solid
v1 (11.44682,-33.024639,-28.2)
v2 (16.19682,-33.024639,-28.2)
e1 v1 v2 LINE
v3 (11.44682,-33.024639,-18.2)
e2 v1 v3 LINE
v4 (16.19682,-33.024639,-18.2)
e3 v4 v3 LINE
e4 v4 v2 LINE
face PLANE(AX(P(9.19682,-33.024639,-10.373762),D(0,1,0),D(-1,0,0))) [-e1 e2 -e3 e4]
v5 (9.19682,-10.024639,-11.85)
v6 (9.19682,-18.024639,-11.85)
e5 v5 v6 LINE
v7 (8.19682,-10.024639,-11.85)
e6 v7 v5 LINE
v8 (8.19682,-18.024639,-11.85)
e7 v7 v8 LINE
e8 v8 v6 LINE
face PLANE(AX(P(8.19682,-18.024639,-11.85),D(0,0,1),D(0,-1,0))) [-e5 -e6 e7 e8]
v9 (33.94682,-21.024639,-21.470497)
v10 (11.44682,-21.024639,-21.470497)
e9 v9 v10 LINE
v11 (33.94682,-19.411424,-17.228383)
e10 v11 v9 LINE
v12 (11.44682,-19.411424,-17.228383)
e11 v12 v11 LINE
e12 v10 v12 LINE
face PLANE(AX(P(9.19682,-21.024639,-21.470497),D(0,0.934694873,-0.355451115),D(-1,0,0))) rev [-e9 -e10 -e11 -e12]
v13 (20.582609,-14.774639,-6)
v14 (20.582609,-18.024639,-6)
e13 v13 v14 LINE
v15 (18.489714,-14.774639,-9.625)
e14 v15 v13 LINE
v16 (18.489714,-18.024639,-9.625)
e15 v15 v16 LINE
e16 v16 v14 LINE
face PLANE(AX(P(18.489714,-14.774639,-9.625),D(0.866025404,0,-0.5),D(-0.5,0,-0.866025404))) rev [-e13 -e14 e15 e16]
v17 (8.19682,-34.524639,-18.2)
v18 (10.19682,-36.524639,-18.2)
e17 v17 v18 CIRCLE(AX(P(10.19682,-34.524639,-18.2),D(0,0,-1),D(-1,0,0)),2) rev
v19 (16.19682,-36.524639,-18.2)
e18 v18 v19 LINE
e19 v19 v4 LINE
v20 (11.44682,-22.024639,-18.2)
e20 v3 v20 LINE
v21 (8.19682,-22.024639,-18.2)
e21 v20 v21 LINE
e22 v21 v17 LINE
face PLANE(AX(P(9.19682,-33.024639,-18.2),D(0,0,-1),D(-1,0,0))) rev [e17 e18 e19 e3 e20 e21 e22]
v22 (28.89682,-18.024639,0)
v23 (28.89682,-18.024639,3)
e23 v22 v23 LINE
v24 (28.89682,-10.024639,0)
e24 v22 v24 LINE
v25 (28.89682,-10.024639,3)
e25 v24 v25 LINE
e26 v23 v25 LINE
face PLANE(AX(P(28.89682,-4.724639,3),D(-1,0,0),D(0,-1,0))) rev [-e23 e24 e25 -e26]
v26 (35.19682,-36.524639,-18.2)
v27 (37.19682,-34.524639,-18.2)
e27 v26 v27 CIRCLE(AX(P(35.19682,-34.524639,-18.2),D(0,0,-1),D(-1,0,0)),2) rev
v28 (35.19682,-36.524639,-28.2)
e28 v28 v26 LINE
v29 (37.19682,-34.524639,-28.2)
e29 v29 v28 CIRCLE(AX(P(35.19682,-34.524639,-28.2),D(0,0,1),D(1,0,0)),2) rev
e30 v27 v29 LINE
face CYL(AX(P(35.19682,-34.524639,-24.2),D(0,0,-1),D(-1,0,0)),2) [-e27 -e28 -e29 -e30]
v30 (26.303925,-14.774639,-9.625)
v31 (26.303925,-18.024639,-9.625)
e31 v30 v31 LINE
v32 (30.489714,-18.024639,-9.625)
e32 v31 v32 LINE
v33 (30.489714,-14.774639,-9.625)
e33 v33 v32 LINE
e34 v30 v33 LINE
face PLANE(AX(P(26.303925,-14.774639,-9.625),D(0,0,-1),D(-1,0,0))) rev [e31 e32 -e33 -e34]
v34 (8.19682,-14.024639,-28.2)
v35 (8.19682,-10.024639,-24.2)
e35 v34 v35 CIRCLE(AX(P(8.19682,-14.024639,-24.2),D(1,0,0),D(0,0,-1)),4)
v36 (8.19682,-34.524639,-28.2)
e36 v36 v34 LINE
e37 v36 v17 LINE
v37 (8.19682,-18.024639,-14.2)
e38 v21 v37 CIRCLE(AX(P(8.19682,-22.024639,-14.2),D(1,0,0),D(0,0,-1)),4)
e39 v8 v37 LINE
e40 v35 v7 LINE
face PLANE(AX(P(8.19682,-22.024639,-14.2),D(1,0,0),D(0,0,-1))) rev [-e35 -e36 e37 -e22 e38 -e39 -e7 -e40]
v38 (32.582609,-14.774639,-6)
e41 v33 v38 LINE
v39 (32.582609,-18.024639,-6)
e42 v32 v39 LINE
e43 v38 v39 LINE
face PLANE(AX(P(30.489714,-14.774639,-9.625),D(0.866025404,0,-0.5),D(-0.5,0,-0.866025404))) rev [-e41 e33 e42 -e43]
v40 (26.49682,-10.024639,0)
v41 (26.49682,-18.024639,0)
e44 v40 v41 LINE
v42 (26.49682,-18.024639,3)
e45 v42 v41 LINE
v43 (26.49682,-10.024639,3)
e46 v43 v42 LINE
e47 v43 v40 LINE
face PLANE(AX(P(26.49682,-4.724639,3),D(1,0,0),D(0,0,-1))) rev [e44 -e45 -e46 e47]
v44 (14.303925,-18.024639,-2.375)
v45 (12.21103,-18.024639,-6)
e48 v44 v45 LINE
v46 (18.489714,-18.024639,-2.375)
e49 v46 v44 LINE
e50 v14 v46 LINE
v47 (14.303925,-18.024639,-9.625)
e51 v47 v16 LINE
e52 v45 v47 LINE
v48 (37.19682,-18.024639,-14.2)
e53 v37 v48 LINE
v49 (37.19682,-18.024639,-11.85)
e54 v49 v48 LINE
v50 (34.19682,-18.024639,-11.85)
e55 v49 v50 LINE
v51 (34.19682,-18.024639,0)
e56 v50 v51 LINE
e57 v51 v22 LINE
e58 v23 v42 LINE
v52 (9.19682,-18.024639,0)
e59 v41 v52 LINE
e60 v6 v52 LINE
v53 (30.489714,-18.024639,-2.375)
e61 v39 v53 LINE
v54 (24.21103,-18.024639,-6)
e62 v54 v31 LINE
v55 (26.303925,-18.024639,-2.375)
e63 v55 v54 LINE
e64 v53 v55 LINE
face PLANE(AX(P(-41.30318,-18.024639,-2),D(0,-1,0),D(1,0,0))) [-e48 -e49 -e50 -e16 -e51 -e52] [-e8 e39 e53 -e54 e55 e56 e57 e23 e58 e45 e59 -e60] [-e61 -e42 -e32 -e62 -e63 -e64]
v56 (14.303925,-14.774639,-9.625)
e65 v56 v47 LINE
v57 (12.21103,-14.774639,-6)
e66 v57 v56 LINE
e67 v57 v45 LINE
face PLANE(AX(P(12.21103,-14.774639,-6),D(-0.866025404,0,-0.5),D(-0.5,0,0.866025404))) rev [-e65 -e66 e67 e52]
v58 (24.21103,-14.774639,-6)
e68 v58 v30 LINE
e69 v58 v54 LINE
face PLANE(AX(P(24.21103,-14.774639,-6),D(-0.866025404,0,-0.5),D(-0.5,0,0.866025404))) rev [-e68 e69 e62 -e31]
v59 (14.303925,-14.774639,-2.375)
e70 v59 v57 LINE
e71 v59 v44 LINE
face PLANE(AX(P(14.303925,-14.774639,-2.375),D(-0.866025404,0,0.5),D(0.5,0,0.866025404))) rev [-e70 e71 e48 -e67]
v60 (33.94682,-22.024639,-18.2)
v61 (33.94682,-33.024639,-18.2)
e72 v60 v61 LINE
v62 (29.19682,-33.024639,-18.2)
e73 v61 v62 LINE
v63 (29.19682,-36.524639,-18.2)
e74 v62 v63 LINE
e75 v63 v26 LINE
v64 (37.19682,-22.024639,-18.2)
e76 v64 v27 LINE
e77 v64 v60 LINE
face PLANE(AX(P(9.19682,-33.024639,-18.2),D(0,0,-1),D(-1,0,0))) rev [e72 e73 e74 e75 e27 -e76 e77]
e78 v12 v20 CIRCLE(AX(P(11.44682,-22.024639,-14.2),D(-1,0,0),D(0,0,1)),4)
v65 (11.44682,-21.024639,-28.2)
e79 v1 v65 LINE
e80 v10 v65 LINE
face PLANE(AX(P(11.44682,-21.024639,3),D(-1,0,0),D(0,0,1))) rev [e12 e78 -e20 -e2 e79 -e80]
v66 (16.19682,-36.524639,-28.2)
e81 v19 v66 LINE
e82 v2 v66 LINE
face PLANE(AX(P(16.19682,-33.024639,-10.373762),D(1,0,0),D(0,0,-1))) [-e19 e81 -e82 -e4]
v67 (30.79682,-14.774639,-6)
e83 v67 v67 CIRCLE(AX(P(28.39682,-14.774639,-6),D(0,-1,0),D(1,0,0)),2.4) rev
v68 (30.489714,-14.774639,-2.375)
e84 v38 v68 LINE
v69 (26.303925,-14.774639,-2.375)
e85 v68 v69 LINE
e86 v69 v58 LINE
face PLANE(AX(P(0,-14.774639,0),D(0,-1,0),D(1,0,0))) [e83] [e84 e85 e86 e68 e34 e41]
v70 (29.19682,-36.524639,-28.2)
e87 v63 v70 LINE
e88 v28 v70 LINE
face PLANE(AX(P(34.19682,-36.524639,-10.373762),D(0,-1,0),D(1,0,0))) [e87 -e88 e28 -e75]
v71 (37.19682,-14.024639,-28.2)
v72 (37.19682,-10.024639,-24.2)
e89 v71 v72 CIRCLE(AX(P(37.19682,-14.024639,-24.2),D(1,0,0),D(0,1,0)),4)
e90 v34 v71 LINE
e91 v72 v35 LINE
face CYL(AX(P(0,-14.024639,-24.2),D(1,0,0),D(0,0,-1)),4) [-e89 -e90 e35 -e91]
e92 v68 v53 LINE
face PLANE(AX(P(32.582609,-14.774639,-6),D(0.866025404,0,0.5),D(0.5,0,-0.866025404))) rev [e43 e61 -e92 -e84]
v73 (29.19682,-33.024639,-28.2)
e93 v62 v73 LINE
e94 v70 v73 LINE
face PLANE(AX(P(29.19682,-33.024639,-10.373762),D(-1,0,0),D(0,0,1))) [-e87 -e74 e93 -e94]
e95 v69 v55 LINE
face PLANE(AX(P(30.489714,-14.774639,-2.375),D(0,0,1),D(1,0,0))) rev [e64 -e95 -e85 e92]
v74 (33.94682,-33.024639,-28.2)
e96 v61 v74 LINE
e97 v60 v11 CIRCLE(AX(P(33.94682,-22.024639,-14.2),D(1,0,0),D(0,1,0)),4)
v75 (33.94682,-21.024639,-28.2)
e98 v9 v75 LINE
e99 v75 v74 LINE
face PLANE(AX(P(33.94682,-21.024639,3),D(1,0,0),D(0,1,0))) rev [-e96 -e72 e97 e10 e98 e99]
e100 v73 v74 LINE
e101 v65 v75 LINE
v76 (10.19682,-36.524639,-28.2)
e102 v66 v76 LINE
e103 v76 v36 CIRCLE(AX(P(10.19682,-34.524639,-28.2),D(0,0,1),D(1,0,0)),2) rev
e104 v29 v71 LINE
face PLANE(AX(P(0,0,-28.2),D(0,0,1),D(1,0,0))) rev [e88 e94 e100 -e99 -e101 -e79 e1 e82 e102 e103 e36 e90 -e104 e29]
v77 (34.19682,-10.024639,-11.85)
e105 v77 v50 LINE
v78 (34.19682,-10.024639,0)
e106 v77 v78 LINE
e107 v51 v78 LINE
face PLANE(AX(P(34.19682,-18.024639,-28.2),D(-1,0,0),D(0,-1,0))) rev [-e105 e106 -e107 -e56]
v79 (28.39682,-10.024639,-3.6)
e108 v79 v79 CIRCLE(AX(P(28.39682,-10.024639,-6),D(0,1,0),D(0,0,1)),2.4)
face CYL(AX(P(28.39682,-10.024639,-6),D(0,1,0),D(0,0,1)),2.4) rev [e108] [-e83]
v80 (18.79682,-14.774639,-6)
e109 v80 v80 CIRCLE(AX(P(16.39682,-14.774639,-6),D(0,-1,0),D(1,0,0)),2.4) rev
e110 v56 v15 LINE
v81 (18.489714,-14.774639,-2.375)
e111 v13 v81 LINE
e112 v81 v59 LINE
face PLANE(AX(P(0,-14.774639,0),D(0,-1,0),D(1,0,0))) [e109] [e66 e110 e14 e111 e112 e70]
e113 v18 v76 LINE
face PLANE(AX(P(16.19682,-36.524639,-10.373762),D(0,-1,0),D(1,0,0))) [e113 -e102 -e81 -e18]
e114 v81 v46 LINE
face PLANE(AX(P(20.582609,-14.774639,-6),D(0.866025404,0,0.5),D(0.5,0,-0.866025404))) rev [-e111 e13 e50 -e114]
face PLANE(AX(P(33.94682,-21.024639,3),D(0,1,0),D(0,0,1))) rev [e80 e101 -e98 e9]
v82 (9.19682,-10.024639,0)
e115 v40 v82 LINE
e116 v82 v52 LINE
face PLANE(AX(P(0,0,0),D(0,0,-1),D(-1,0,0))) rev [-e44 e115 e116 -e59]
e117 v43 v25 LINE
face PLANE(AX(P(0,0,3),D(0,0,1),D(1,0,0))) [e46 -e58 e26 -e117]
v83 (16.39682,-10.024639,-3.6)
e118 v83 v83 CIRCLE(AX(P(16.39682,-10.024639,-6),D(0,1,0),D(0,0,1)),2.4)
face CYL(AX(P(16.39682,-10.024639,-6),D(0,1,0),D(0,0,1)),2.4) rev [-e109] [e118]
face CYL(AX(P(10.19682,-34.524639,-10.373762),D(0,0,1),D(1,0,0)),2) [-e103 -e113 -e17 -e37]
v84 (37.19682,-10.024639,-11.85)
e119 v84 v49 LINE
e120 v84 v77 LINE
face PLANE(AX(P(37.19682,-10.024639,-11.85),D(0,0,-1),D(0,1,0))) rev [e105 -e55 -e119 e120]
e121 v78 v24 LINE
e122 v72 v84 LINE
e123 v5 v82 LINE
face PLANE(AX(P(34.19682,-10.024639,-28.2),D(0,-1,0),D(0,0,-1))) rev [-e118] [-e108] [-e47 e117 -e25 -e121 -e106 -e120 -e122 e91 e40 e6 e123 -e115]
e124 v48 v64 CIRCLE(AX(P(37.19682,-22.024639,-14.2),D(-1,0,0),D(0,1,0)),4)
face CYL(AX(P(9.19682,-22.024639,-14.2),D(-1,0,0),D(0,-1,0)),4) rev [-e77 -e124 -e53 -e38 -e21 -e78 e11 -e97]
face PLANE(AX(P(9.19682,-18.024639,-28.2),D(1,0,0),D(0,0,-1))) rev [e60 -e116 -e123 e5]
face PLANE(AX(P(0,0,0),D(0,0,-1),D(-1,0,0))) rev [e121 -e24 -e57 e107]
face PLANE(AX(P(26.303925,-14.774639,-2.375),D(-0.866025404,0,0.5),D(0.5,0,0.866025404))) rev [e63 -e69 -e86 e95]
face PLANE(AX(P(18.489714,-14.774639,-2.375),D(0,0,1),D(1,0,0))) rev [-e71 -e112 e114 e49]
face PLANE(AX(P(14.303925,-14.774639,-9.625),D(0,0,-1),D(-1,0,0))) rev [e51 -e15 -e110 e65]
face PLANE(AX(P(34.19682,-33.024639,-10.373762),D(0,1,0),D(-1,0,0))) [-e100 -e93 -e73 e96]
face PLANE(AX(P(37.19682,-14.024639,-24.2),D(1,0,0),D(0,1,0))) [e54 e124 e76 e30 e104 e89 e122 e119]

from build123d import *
from OCP.BRepFilletAPI import BRepFilletAPI_MakeChamfer
from build123d.topology import SkipClean

# Parameters (mm, degrees)
SKETCH1_R                      = 3.1
SKETCH1_R_2                    = 3.5
SKETCH1_W                      = 32
SKETCH1_H                      = 15.65
BOSS_EXTRUDE1_DEPTH            = 11.7
CUT_EXTRUDE5_DEPTH             = 14
CUT_EXTRUDE8_REACH             = 96.23
SKETCH10_R                     = 1.675
CUT_EXTRUDE8_DIRECTION_2_REACH = 96.23
CUT_EXTRUDE9_REACH             = 94.724
SKETCH11_R                     = 1.625
CUT_EXTRUDE9_DIRECTION_2_REACH = 94.724
CUT_EXTRUDE10_DEPTH            = 2.3
CUT_EXTRUDE11_DEPTH            = 2.3
HOLE1_D                        = 4.8
HOLE1_DEPTH                    = 12
HOLE1_CBORE_D                  = 5.4
HOLE1_CBORE_DEPTH              = 6
CUT_EXTRUDE17_REACH            = 66.001
SKETCH30_W                     = 59.4
SKETCH30_H                     = 25.65
SKETCH32_W                     = 99
SKETCH32_H                     = 8
CUT_EXTRUDE20_DEPTH            = 65.000566192
CHAMFER1_SIZE                  = 6
CHAMFER1_SIZE_2                = 0.3
FILLET1_R                      = 2
SKETCH33_W                     = 2.4
SKETCH33_H                     = 5.3
BOSS_EXTRUDE2_DEPTH            = 3
SKETCH34_W                     = 99
SKETCH34_H                     = 8
CUT_EXTRUDE21_DEPTH            = 61.759087383
CUT_EXTRUDE22_START            = -11.7
CUT_EXTRUDE22_DEPTH            = 11.7
BOSS_EXTRUDE4_DEPTH            = 8
SKETCH37_W                     = 25
SKETCH37_H                     = 8
BOSS_EXTRUDE5_DEPTH            = 16.5
SKETCH39_W                     = 25
SKETCH39_H                     = 10
BOSS_EXTRUDE6_DEPTH            = 15
SKETCH40_W                     = 22.5
SKETCH40_H                     = 12
CUT_EXTRUDE23_DEPTH            = 72.876300078
FILLET2_R                      = 4
CUT_EXTRUDE26_DEPTH            = 67.820749119
SKETCH49_W                     = 5
SKETCH49_H                     = 3.5
SKETCH49_W_2                   = 7
BOSS_EXTRUDE7_DEPTH            = 10
M4_CLEARANCE_HOLE1_D           = 4.8
CUT_EXTRUDE27_DEPTH            = 3.25
BOSS_EXTRUDE9_DEPTH            = 3
CHAMFER2_START                 = 11.446819666
CHAMFER2_DEPTH                 = 22.5
BOSS_EXTRUDE10_START           = -25
BOSS_EXTRUDE10_DEPTH           = 1
FILLET3_R                      = 2


with BuildPart() as part:
    # Sketch1 → Boss-Extrude1 (new body)
    with BuildSketch(Plane.XY):
        Polygon((-43.303180334, 29.275360835), (25.696819666, 29.275360835), (55.696819666, 29.275360835), (55.696819666, -18.024639165), (-43.303180334, -18.024639165), align=None)
        with Locations((-32.303180334, 10.275360835)):
            Circle(SKETCH1_R, mode=Mode.SUBTRACT)
        with Locations((44.696819666, 10.275360835)):
            Circle(SKETCH1_R, mode=Mode.SUBTRACT)
        with Locations((22.696819666, 12.275360835)):
            Circle(SKETCH1_R_2, mode=Mode.SUBTRACT)
        with Locations((-6.803180334, 11.450360835)):
            Rectangle(SKETCH1_W, SKETCH1_H, mode=Mode.SUBTRACT)
    extrude(amount=-BOSS_EXTRUDE1_DEPTH)

    # Sketch7 → Cut-Extrude5 (cut)
    with BuildSketch(Plane.XY):
        with BuildLine():
            Line((-43.303180334, 22.775360835), (-22.503180334, 22.775360835))
            Line((-22.503180334, 22.775360835), (-22.503180334, 3.625360835))
            Line((-22.503180334, 3.625360835), (-24.503180334, 3.625360835))
            Line((-24.503180334, 3.625360835), (-24.503180334, 21.275360835))
            Line((-24.503180334, 21.275360835), (-31.503180334, 21.275360835))
            Line((-31.503180334, 21.275360835), (-31.503180334, 13.270356662))
            ThreePointArc((-31.503180334, 13.270356662), (-32.303180334, 7.175360835), (-33.103180334, 13.270356662))
            Line((-33.103180334, 13.270356662), (-33.103180334, 21.275360835))
            Line((-33.103180334, 21.275360835), (-40.103180334, 21.275360835))
            Line((-40.103180334, 21.275360835), (-40.103180334, 3.625360835))
            Line((-40.103180334, 3.625360835), (-43.303180334, 3.625360835))
            Line((-43.303180334, 3.625360835), (-43.303180334, 22.775360835))
        make_face()
        with BuildLine():
            Line((34.896819666, 22.775360835), (55.696819666, 22.775360835))
            Line((55.696819666, 22.775360835), (55.696819666, 3.625360835))
            Line((55.696819666, 3.625360835), (52.496819666, 3.625360835))
            Line((52.496819666, 3.625360835), (52.496819666, 21.275360835))
            Line((52.496819666, 21.275360835), (45.496819666, 21.275360835))
            Line((45.496819666, 21.275360835), (45.496819666, 13.270356662))
            ThreePointArc((45.496819666, 13.270356662), (44.696819666, 7.175360835), (43.896819666, 13.270356662))
            Line((43.896819666, 13.270356662), (43.896819666, 21.275360835))
            Line((43.896819666, 21.275360835), (36.896819666, 21.275360835))
            Line((36.896819666, 21.275360835), (36.896819666, 3.625360835))
            Line((36.896819666, 3.625360835), (34.896819666, 3.625360835))
            Line((34.896819666, 3.625360835), (34.896819666, 22.775360835))
        make_face()
    extrude(amount=-CUT_EXTRUDE5_DEPTH, mode=Mode.SUBTRACT)

    # Sketch10 → Cut-Extrude8 (cut, up to next)
    with BuildSketch(Plane(origin=(-33.103180334, 0, 0), x_dir=(0, 0, -1), z_dir=(1, 0, 0)), mode=Mode.PRIVATE) as cut_extrude8_sk1:
        with Locations(Location((5.85, 17.272858748, 0), (0, 0, 270))):
            Circle(SKETCH10_R)
    cut_extrude8_tool1 = extrude(cut_extrude8_sk1.sketch, amount=-CUT_EXTRUDE8_REACH, mode=Mode.PRIVATE) & part.part
    add(cut_extrude8_tool1.solids().sort_by_distance((-33.10318, 17.272859, -5.85))[0], mode=Mode.SUBTRACT)

    # Sketch10 → Cut-Extrude8 direction 2 (cut, up to next)
    with BuildSketch(Plane(origin=(-33.103180334, 0, 0), x_dir=(0, 0, -1), z_dir=(1, 0, 0)), mode=Mode.PRIVATE) as cut_extrude8_direction_2_sk1:
        with Locations(Location((5.85, 17.272858748, 0), (0, 0, 270))):
            Circle(SKETCH10_R)
    cut_extrude8_direction_2_tool1 = extrude(cut_extrude8_direction_2_sk1.sketch, amount=CUT_EXTRUDE8_DIRECTION_2_REACH, mode=Mode.PRIVATE) & part.part
    add(cut_extrude8_direction_2_tool1.solids().sort_by_distance((-33.10318, 17.272859, -5.85))[0], mode=Mode.SUBTRACT)

    # Sketch11 → Cut-Extrude9 (cut, up to next)
    with BuildSketch(Plane(origin=(43.896819666, 0, 0), x_dir=(0, 0, -1), z_dir=(1, 0, 0)), mode=Mode.PRIVATE) as cut_extrude9_sk1:
        with Locations(Location((5.85, 17.272858748, 0), (0, 0, 180))):
            Circle(SKETCH11_R)
    cut_extrude9_tool1 = extrude(cut_extrude9_sk1.sketch, amount=-CUT_EXTRUDE9_REACH, mode=Mode.PRIVATE) & part.part
    add(cut_extrude9_tool1.solids().sort_by_distance((43.89682, 17.272859, -5.85))[0], mode=Mode.SUBTRACT)

    # Sketch11 → Cut-Extrude9 direction 2 (cut, up to next)
    with BuildSketch(Plane(origin=(43.896819666, 0, 0), x_dir=(0, 0, -1), z_dir=(1, 0, 0)), mode=Mode.PRIVATE) as cut_extrude9_direction_2_sk1:
        with Locations(Location((5.85, 17.272858748, 0), (0, 0, 180))):
            Circle(SKETCH11_R)
    cut_extrude9_direction_2_tool1 = extrude(cut_extrude9_direction_2_sk1.sketch, amount=CUT_EXTRUDE9_DIRECTION_2_REACH, mode=Mode.PRIVATE) & part.part
    add(cut_extrude9_direction_2_tool1.solids().sort_by_distance((43.89682, 17.272859, -5.85))[0], mode=Mode.SUBTRACT)

    # Sketch12 → Cut-Extrude10 (cut)
    with BuildSketch(Plane.ZY.offset(-36.896819666)):
        Polygon((-4.146816706, 20.222858748), (0, 20.222858748), (0, 14.322858748), (-4.146816706, 14.322858748), (-7.553183294, 14.322858748), (-9.256366588, 17.272858748), (-7.553183294, 20.222858748), align=None)
    extrude(amount=-CUT_EXTRUDE10_DEPTH, mode=Mode.SUBTRACT)

    # Sketch13 → Cut-Extrude11 (cut)
    with BuildSketch(Plane(origin=(-24.503180334, 0, 0), x_dir=(0, 0, -1), z_dir=(1, 0, 0))):
        Polygon((4.146816706, 20.222858748), (0, 20.222858748), (0, 14.322858748), (4.146816706, 14.322858748), (7.553183294, 14.322858748), (9.256366588, 17.272858748), (7.553183294, 20.222858748), align=None)
    extrude(amount=-CUT_EXTRUDE11_DEPTH, mode=Mode.SUBTRACT)

    # Hole1
    with Locations(Plane(origin=(0, 3.625360835, 0), x_dir=(1, 0, 0), z_dir=(0, 1, 0))):
        with Locations((-15.653180334, 5.85), (0.346819666, 5.85)):
            CounterBoreHole(HOLE1_D / 2, HOLE1_CBORE_D / 2, HOLE1_CBORE_DEPTH, depth=HOLE1_DEPTH)

    # Sketch30 → Cut-Extrude17 (cut, up to next)
    with BuildSketch(Plane(origin=(0, 0, -11.7), x_dir=(-1, 0, 0), z_dir=(0, 0, -1)), mode=Mode.PRIVATE) as cut_extrude17_sk1:
        with Locations((-5.196819666, 16.450360835)):
            Rectangle(SKETCH30_W, SKETCH30_H)
    cut_extrude17_tool1 = extrude(cut_extrude17_sk1.sketch, amount=-CUT_EXTRUDE17_REACH, mode=Mode.PRIVATE) & part.part
    add(cut_extrude17_tool1.solids().sort_by_distance((5.19682, 16.450361, -11.7))[0], mode=Mode.SUBTRACT)


with BuildPart() as cut_extrude17_piece_1:
    # of the separate pieces the step leaves, piece 1, a body of its own (cut_extrude17_pieces)
    add(part.part.solids().sort_by_distance((-24.503180334, 3.625360835, 0))[0])

    # Chamfer1
    chamfer1_edges_1 = [cut_extrude17_piece_1.edges().sort_by_distance(p)[0] for p in [
        (-2.353180334, -2.374639165, -5.85),
    ]]
    chamfer1_side_1 = [cut_extrude17_piece_1.faces().sort_by_distance(p)[0] for p in [
        (-2.353180334, -2.368639165, -5.85),
    ]]
    chamfer1_edges_2 = [cut_extrude17_piece_1.edges().sort_by_distance(p)[0] for p in [
        (-18.353180334, -2.374639165, -5.85),
    ]]
    chamfer1_side_2 = [cut_extrude17_piece_1.faces().sort_by_distance(p)[0] for p in [
        (-18.353180334, -2.368639165, -5.85),
    ]]
    chamfer1 = BRepFilletAPI_MakeChamfer(cut_extrude17_piece_1.part.solid().wrapped)
    for e in chamfer1_edges_1:
        chamfer1.Add(CHAMFER1_SIZE - 0.0001, CHAMFER1_SIZE_2 - 0.0001, e.wrapped, chamfer1_side_1[0].wrapped)
    for e in chamfer1_edges_2:
        chamfer1.Add(CHAMFER1_SIZE - 0.0001, CHAMFER1_SIZE_2 - 0.0001, e.wrapped, chamfer1_side_2[0].wrapped)
    add(Compound.cast(chamfer1.Shape()), mode=Mode.REPLACE)  # a hair under: the kernel refuses the full size

    # Fillet1
    # the kernel refuses this fillet: 2 mm, written as the material it takes off along each edge
    with BuildSketch(Plane(origin=(50.496819666, 19.275360835, -2), x_dir=(1, 0, 0), z_dir=(0, 1, 0))) as fillet1_piece_1_section:
        Polygon((0, 0), (FILLET1_R, 0), (FILLET1_R, -FILLET1_R), (0, -FILLET1_R), align=None)
    fillet1_piece_1 = extrude(amount=FILLET1_R, mode=Mode.PRIVATE)
    fillet1_piece_1 = fillet1_piece_1 - Plane(origin=(50.496819666, 19.275360835, -2), x_dir=(-0.7071067811865475, 0, -0.7071067811865475), z_dir=(0, 1, 0)) * Sphere(FILLET1_R, mode=Mode.PRIVATE)
    add(fillet1_piece_1, mode=Mode.SUBTRACT)
    with BuildSketch(Plane(origin=(50.496819666, 19.275360835, -9.7), x_dir=(1, 0, 0), z_dir=(0, 1, 0))) as fillet1_piece_2_section:
        Polygon((0, 0), (FILLET1_R, 0), (FILLET1_R, FILLET1_R), (0, FILLET1_R), align=None)
    fillet1_piece_2 = extrude(amount=FILLET1_R, mode=Mode.PRIVATE)
    fillet1_piece_2 = fillet1_piece_2 - Plane(origin=(50.496819666, 19.275360835, -9.7), x_dir=(-0.7071067811865475, 0, 0.7071067811865475), z_dir=(0, 1, 0)) * Sphere(FILLET1_R, mode=Mode.PRIVATE)
    add(fillet1_piece_2, mode=Mode.SUBTRACT)
    with BuildSketch(Plane(origin=(38.896819666, 19.275360835, -9.7), x_dir=(-1, 0, 0), z_dir=(0, 0, -1))) as fillet1_piece_3_section:
        Polygon((0, 0), (FILLET1_R, 0), (FILLET1_R, FILLET1_R), (0, FILLET1_R), align=None)
    fillet1_piece_3 = extrude(amount=FILLET1_R, mode=Mode.PRIVATE)
    fillet1_piece_3 = fillet1_piece_3 - Plane(origin=(38.896819666, 19.275360835, -9.7), x_dir=(0.7071067811865475, -0.7071067811865475, 0), z_dir=(0, 0, -1)) * Sphere(FILLET1_R, mode=Mode.PRIVATE)
    add(fillet1_piece_3, mode=Mode.SUBTRACT)
    with BuildSketch(Plane(origin=(-38.103180334, 19.275360835, -2), x_dir=(0, 1, 0), z_dir=(-1, 0, 0))) as fillet1_piece_4_section:
        Polygon((0, 0), (FILLET1_R, 0), (FILLET1_R, -FILLET1_R), (0, -FILLET1_R), align=None)
    fillet1_piece_4 = extrude(amount=FILLET1_R, mode=Mode.PRIVATE)
    fillet1_piece_4 = fillet1_piece_4 - Plane(origin=(-38.103180334, 19.275360835, -2), x_dir=(0, -0.7071067811865475, -0.7071067811865475), z_dir=(-1, 0, 0)) * Sphere(FILLET1_R, mode=Mode.PRIVATE)
    add(fillet1_piece_4, mode=Mode.SUBTRACT)
    with BuildSketch(Plane(origin=(-38.103180334, 19.275360835, -9.7), x_dir=(0, 1, 0), z_dir=(-1, 0, 0))) as fillet1_piece_5_section:
        Polygon((0, 0), (FILLET1_R, 0), (FILLET1_R, FILLET1_R), (0, FILLET1_R), align=None)
    fillet1_piece_5 = extrude(amount=FILLET1_R, mode=Mode.PRIVATE)
    fillet1_piece_5 = fillet1_piece_5 - Plane(origin=(-38.103180334, 19.275360835, -9.7), x_dir=(0, -0.7071067811865475, 0.7071067811865475), z_dir=(-1, 0, 0)) * Sphere(FILLET1_R, mode=Mode.PRIVATE)
    add(fillet1_piece_5, mode=Mode.SUBTRACT)
    with BuildSketch(Plane(origin=(-26.503180334, 19.275360835, -9.7), x_dir=(0, 0, -1), z_dir=(1, 0, 0))) as fillet1_piece_6_section:
        Polygon((0, 0), (FILLET1_R, 0), (FILLET1_R, FILLET1_R), (0, FILLET1_R), align=None)
    fillet1_piece_6 = extrude(amount=FILLET1_R, mode=Mode.PRIVATE)
    fillet1_piece_6 = fillet1_piece_6 - Plane(origin=(-26.503180334, 19.275360835, -9.7), x_dir=(0, -0.7071067811865475, 0.7071067811865475), z_dir=(1, 0, 0)) * Sphere(FILLET1_R, mode=Mode.PRIVATE)
    add(fillet1_piece_6, mode=Mode.SUBTRACT)
    with BuildSketch(Plane(origin=(52.496819666, 21.275360835, -2), x_dir=(-1, 0, 0), z_dir=(0, 0, -1)), Plane(origin=(-40.103180334, 21.275360835, -2), x_dir=(0, -1, 0), z_dir=(0, 0, -1))) as fillet1_piece_7:
        with BuildLine():
            CenterArc((FILLET1_R, -FILLET1_R), FILLET1_R, 90, 90)
            Line((0, -FILLET1_R), (0, 0))
            Line((0, 0), (FILLET1_R, 0))
        make_face()
    extrude(amount=7.7, mode=Mode.SUBTRACT)
    with BuildSketch(Plane(origin=(50.496819666, 21.275360835, 0), x_dir=(0, -1, 0), z_dir=(-1, 0, 0)), Plane(origin=(40.496819666, 21.275360835, -11.7), x_dir=(0, -1, 0), z_dir=(1, 0, 0)), Plane(origin=(38.896819666, 21.275360835, -11.7), x_dir=(0, -1, 0), z_dir=(1, 0, 0)), Plane(origin=(-28.103180334, 21.275360835, 0), x_dir=(0, -1, 0), z_dir=(-1, 0, 0)), Plane(origin=(-38.103180334, 21.275360835, -11.7), x_dir=(0, -1, 0), z_dir=(1, 0, 0)), Plane(origin=(-36.503180334, 21.275360835, -11.7), x_dir=(0, -1, 0), z_dir=(1, 0, 0))) as fillet1_piece_8:
        with BuildLine():
            CenterArc((FILLET1_R, -FILLET1_R), FILLET1_R, 90, 90)
            Line((0, -FILLET1_R), (0, 0))
            Line((0, 0), (FILLET1_R, 0))
        make_face()
    extrude(amount=10, mode=Mode.SUBTRACT)
    with BuildSketch(Plane(origin=(45.496819666, 21.275360835, 5), x_dir=(0, -1, 0), z_dir=(0, 0, -1)), Plane(origin=(43.896819666, 21.275360835, 5), x_dir=(-1, 0, 0), z_dir=(0, 0, -1)), Plane(origin=(-33.103180334, 21.275360835, 5), x_dir=(-1, 0, 0), z_dir=(0, 0, -1)), Plane(origin=(55.696819666, 3.625360835, 5), x_dir=(-1, 0, 0), z_dir=(0, 0, -1)), Plane(origin=(-43.303180334, 3.625360835, 5), x_dir=(0, -1, 0), z_dir=(0, 0, -1))) as fillet1_piece_9:
        with BuildLine():
            CenterArc((FILLET1_R, -FILLET1_R), FILLET1_R, 90, 90)
            Line((0, -FILLET1_R), (0, 0))
            Line((0, 0), (FILLET1_R, 0))
        make_face()
    extrude(amount=21.7, mode=Mode.SUBTRACT)
    with BuildSketch(Plane(origin=(48.896819666, 21.275360835, 0), x_dir=(0, -1, 0), z_dir=(-1, 0, 0)), Plane(origin=(-19.503180334, 21.275360835, 0), x_dir=(0, -1, 0), z_dir=(-1, 0, 0))) as fillet1_piece_10:
        with BuildLine():
            CenterArc((FILLET1_R, -FILLET1_R), FILLET1_R, 90, 90)
            Line((0, -FILLET1_R), (0, 0))
            Line((0, 0), (FILLET1_R, 0))
        make_face()
    extrude(amount=17, mode=Mode.SUBTRACT)
    with BuildSketch(Plane(origin=(36.896819666, 21.275360835, 5), x_dir=(0, -1, 0), z_dir=(0, 0, -1))) as fillet1_piece_11:
        with BuildLine():
            CenterArc((FILLET1_R, -FILLET1_R), FILLET1_R, 90, 90)
            Line((0, -FILLET1_R), (0, 0))
            Line((0, 0), (FILLET1_R, 0))
        make_face()
    extrude(amount=14.7, mode=Mode.SUBTRACT)
    with BuildSketch(Plane(origin=(-24.503180334, 21.275360835, 5), x_dir=(0, -1, 0), z_dir=(0, 0, -1))) as fillet1_piece_12:
        with BuildLine():
            CenterArc((FILLET1_R, FILLET1_R), FILLET1_R, 180, 90)
            Line((0, FILLET1_R), (0, 0))
            Line((0, 0), (FILLET1_R, 0))
        make_face()
    extrude(amount=14.7, mode=Mode.SUBTRACT)
    with BuildSketch(Plane(origin=(-31.503180334, 21.275360835, 5), x_dir=(1, 0, 0), z_dir=(0, 0, -1))) as fillet1_piece_13:
        with BuildLine():
            CenterArc((FILLET1_R, FILLET1_R), FILLET1_R, 180, 90)
            Line((0, FILLET1_R), (0, 0))
            Line((0, 0), (FILLET1_R, 0))
        make_face()
    extrude(amount=21.7, mode=Mode.SUBTRACT)
    with BuildSketch(Plane(origin=(55.696819666, 8.625360835, 0), x_dir=(-1, 0, 0), z_dir=(0, -1, 0)), Plane(origin=(-43.303180334, -23.024639165, 0), x_dir=(1, 0, 0), z_dir=(0, 1, 0))) as fillet1_piece_14:
        with BuildLine():
            CenterArc((FILLET1_R, FILLET1_R), FILLET1_R, 180, 90)
            Line((0, FILLET1_R), (0, 0))
            Line((0, 0), (FILLET1_R, 0))
        make_face()
    extrude(amount=31.65, mode=Mode.SUBTRACT)
    with BuildSketch(Plane(origin=(55.696819666, 8.625360835, -11.7), x_dir=(-1, 0, 0), z_dir=(0, -1, 0)), Plane(origin=(-43.303180334, -23.024639165, -11.7), x_dir=(1, 0, 0), z_dir=(0, 1, 0))) as fillet1_piece_15:
        with BuildLine():
            CenterArc((FILLET1_R, -FILLET1_R), FILLET1_R, 90, 90)
            Line((0, -FILLET1_R), (0, 0))
            Line((0, 0), (FILLET1_R, 0))
        make_face()
    extrude(amount=31.65, mode=Mode.SUBTRACT)
    with BuildSketch(Plane(origin=(36.896819666, 3.625360835, -11.7), x_dir=(0, 0, 1), z_dir=(-1, 0, 0))) as fillet1_piece_16:
        with BuildLine():
            CenterArc((FILLET1_R, -FILLET1_R), FILLET1_R, 90, 90)
            Line((0, -FILLET1_R), (0, 0))
            Line((0, 0), (FILLET1_R, 0))
        make_face()
    extrude(amount=61.4, mode=Mode.SUBTRACT)
    with BuildSketch(Plane(origin=(36.896819666, 3.625360835, 0), x_dir=(0, 0, -1), z_dir=(-1, 0, 0))) as fillet1_piece_17:
        with BuildLine():
            CenterArc((FILLET1_R, FILLET1_R), FILLET1_R, 180, 90)
            Line((0, FILLET1_R), (0, 0))
            Line((0, 0), (FILLET1_R, 0))
        make_face()
    extrude(amount=61.4, mode=Mode.SUBTRACT)
    with BuildSketch(Plane(origin=(36.896819666, 19.322858748, 0), x_dir=(0, 0, -1), z_dir=(0, -1, 0)), Plane(origin=(-24.503180334, 3.625360835, 0), x_dir=(0, 0, -1), z_dir=(0, 1, 0))) as fillet1_piece_18:
        with BuildLine():
            CenterArc((FILLET1_R, FILLET1_R), FILLET1_R, 180, 90)
            Line((0, FILLET1_R), (0, 0))
            Line((0, 0), (FILLET1_R, 0))
        make_face()
    extrude(amount=15.697497913, mode=Mode.SUBTRACT)
    with BuildSketch(Plane(origin=(52.496819666, 3.625360835, 0), x_dir=(-1, 0, 0), z_dir=(0, 1, 0)), Plane(origin=(36.896819666, 3.625360835, -11.7), x_dir=(1, 0, 0), z_dir=(0, 1, 0)), Plane(origin=(52.496819666, 19.275360835, -11.7), x_dir=(-1, 0, 0), z_dir=(0, -1, 0)), Plane(origin=(-40.103180334, 19.275360835, 0), x_dir=(1, 0, 0), z_dir=(0, -1, 0)), Plane(origin=(-40.103180334, 3.625360835, -11.7), x_dir=(1, 0, 0), z_dir=(0, 1, 0))) as fillet1_piece_19:
        with BuildLine():
            CenterArc((FILLET1_R, -FILLET1_R), FILLET1_R, 90, 90)
            Line((0, -FILLET1_R), (0, 0))
            Line((0, 0), (FILLET1_R, 0))
        make_face()
    extrude(amount=15.65, mode=Mode.SUBTRACT)
    with BuildSketch(Plane(origin=(-24.503180334, 19.275360835, -11.7), x_dir=(0, 0, 1), z_dir=(0, -1, 0))) as fillet1_piece_20:
        with BuildLine():
            CenterArc((FILLET1_R, FILLET1_R), FILLET1_R, 180, 90)
            Line((0, FILLET1_R), (0, 0))
            Line((0, 0), (FILLET1_R, 0))
        make_face()
    extrude(amount=15.65, mode=Mode.SUBTRACT)
    with BuildSketch(Plane(origin=(41.896819666, 3.625360835, -11.7), x_dir=(0, 0, 1), z_dir=(-1, 0, 0))) as fillet1_piece_21a_section:
        with BuildLine():
            CenterArc((FILLET1_R, -FILLET1_R), FILLET1_R, 90, 90)
            Line((0, -FILLET1_R), (0, 0))
            Line((0, 0), (FILLET1_R, 0))
        make_face()
    fillet1_piece_21a = extrude(amount=66.4, mode=Mode.PRIVATE)
    fillet1_piece_21a = split(fillet1_piece_21a, bisect_by=Plane(origin=(36.896819666, 3.625360835, -11.7), z_dir=(1, 0, 0)), keep=Keep.TOP, mode=Mode.PRIVATE)
    with BuildSketch(Plane(origin=(36.896819666, -1.374639165, -11.7), x_dir=(1, 0, 0), z_dir=(0, 1, 0))) as fillet1_piece_21b_section:
        with BuildLine():
            CenterArc((FILLET1_R, -FILLET1_R), FILLET1_R, 90, 90)
            Line((0, -FILLET1_R), (0, 0))
            Line((0, 0), (FILLET1_R, 0))
        make_face()
    fillet1_piece_21b = extrude(amount=20.65, mode=Mode.PRIVATE)
    fillet1_piece_21b = split(fillet1_piece_21b, bisect_by=Plane(origin=(36.896819666, 3.625360835, -11.7), z_dir=(0, -1, 0)), keep=Keep.TOP, mode=Mode.PRIVATE)
    fillet1_piece_21 = fillet1_piece_21a & fillet1_piece_21b
    add(fillet1_piece_21, mode=Mode.SUBTRACT)
    with BuildSketch(Plane(origin=(36.896819666, 3.625360835, -11.7), x_dir=(0, 0, 1), z_dir=(-1, 0, 0))) as fillet1_piece_22a_section:
        with BuildLine():
            CenterArc((FILLET1_R, -FILLET1_R), FILLET1_R, 90, 90)
            Line((0, -FILLET1_R), (0, 0))
            Line((0, 0), (FILLET1_R, 0))
        make_face()
    fillet1_piece_22a = extrude(amount=66.4, mode=Mode.PRIVATE)
    fillet1_piece_22a = split(fillet1_piece_22a, bisect_by=Plane(origin=(-24.503180334, 3.625360835, -11.7), z_dir=(-1, 0, 0)), keep=Keep.TOP, mode=Mode.PRIVATE)
    with BuildSketch(Plane(origin=(-24.503180334, 19.275360835, -11.7), x_dir=(0, 0, 1), z_dir=(0, -1, 0))) as fillet1_piece_22b_section:
        with BuildLine():
            CenterArc((FILLET1_R, FILLET1_R), FILLET1_R, 180, 90)
            Line((0, FILLET1_R), (0, 0))
            Line((0, 0), (FILLET1_R, 0))
        make_face()
    fillet1_piece_22b = extrude(amount=20.65, mode=Mode.PRIVATE)
    fillet1_piece_22b = split(fillet1_piece_22b, bisect_by=Plane(origin=(-24.503180334, 3.625360835, -11.7), z_dir=(0, -1, 0)), keep=Keep.TOP, mode=Mode.PRIVATE)
    fillet1_piece_22 = fillet1_piece_22a & fillet1_piece_22b
    add(fillet1_piece_22, mode=Mode.SUBTRACT)
    with BuildSketch(Plane(origin=(41.896819666, 3.625360835, 0), x_dir=(0, 0, -1), z_dir=(-1, 0, 0))) as fillet1_piece_23a_section:
        with BuildLine():
            CenterArc((FILLET1_R, FILLET1_R), FILLET1_R, 180, 90)
            Line((0, FILLET1_R), (0, 0))
            Line((0, 0), (FILLET1_R, 0))
        make_face()
    fillet1_piece_23a = extrude(amount=66.4, mode=Mode.PRIVATE)
    fillet1_piece_23a = split(fillet1_piece_23a, bisect_by=Plane(origin=(36.896819666, 3.625360835, 0), z_dir=(1, 0, 0)), keep=Keep.TOP, mode=Mode.PRIVATE)
    with BuildSketch(Plane(origin=(36.896819666, 19.322858748, 0), x_dir=(0, 0, -1), z_dir=(0, -1, 0))) as fillet1_piece_23b_section:
        with BuildLine():
            CenterArc((FILLET1_R, FILLET1_R), FILLET1_R, 180, 90)
            Line((0, FILLET1_R), (0, 0))
            Line((0, 0), (FILLET1_R, 0))
        make_face()
    fillet1_piece_23b = extrude(amount=20.697497913, mode=Mode.PRIVATE)
    fillet1_piece_23b = split(fillet1_piece_23b, bisect_by=Plane(origin=(36.896819666, 3.625360835, 0), z_dir=(0, -1, 0)), keep=Keep.TOP, mode=Mode.PRIVATE)
    fillet1_piece_23 = fillet1_piece_23a & fillet1_piece_23b
    add(fillet1_piece_23, mode=Mode.SUBTRACT)
    with BuildSketch(Plane(origin=(36.896819666, 3.625360835, 0), x_dir=(0, 0, -1), z_dir=(-1, 0, 0))) as fillet1_piece_24a_section:
        with BuildLine():
            CenterArc((FILLET1_R, FILLET1_R), FILLET1_R, 180, 90)
            Line((0, FILLET1_R), (0, 0))
            Line((0, 0), (FILLET1_R, 0))
        make_face()
    fillet1_piece_24a = extrude(amount=66.4, mode=Mode.PRIVATE)
    fillet1_piece_24a = split(fillet1_piece_24a, bisect_by=Plane(origin=(-24.503180334, 3.625360835, 0), z_dir=(-1, 0, 0)), keep=Keep.TOP, mode=Mode.PRIVATE)
    with BuildSketch(Plane(origin=(-24.503180334, -1.374639165, 0), x_dir=(0, 0, -1), z_dir=(0, 1, 0))) as fillet1_piece_24b_section:
        with BuildLine():
            CenterArc((FILLET1_R, FILLET1_R), FILLET1_R, 180, 90)
            Line((0, FILLET1_R), (0, 0))
            Line((0, 0), (FILLET1_R, 0))
        make_face()
    fillet1_piece_24b = extrude(amount=20.697497913, mode=Mode.PRIVATE)
    fillet1_piece_24b = split(fillet1_piece_24b, bisect_by=Plane(origin=(-24.503180334, 3.625360835, 0), z_dir=(0, -1, 0)), keep=Keep.TOP, mode=Mode.PRIVATE)
    fillet1_piece_24 = fillet1_piece_24a & fillet1_piece_24b
    add(fillet1_piece_24, mode=Mode.SUBTRACT)

    # Sketch33 → Boss-Extrude2 (add)
    with BuildSketch(Plane.XY):
        with Locations((27.696819666, -7.374639165)):
            Rectangle(SKETCH33_W, SKETCH33_H)
    extrude(amount=BOSS_EXTRUDE2_DEPTH)

    # Sketch34 → Cut-Extrude21 (cut, through all)
    with BuildSketch(Plane.XY):
        with Locations((6.196819666, -14.024639165)):
            Rectangle(SKETCH34_W, SKETCH34_H)
    extrude(amount=-CUT_EXTRUDE21_DEPTH, mode=Mode.SUBTRACT)

    # Sketch35 → Cut-Extrude22 (cut)
    with BuildSketch(Plane.XY.offset(CUT_EXTRUDE22_START)):
        Polygon((17.396819666, 3.625360835), (28.359065589, 3.625360835), (34.396819666, 3.625360835), (34.396819666, -4.374639165), (10.396819666, -4.374639165), (10.396819666, 1.625360835), (10.396819666, 3.625360835), align=None)
    extrude(amount=CUT_EXTRUDE22_DEPTH, mode=Mode.SUBTRACT)

    # Sketch36 → Boss-Extrude4 (add)
    with SkipClean():  # the faces are left unmerged after this step: merging them gives an invalid solid
        with BuildSketch(Plane.XZ.offset(10.024639165)):
            with BuildLine():
                Line((26.496819666, 3), (26.496819666, 0))
                Line((26.496819666, 0), (-41.303180334, 0))
                ThreePointArc((-41.303180334, 0), (-42.717393896, -0.585786438), (-43.303180334, -2))
                Line((-43.303180334, -2), (-43.303180334, -9.7))
                ThreePointArc((-43.303180334, -9.7), (-42.717393896, -11.114213562), (-41.303180334, -11.7))
                Line((-41.303180334, -11.7), (53.696819666, -11.7))
                ThreePointArc((53.696819666, -11.7), (55.111033228, -11.114213562), (55.696819666, -9.7))
                Line((55.696819666, -9.7), (55.696819666, -2))
                ThreePointArc((55.696819666, -2), (55.111033228, -0.585786438), (53.696819666, 0))
                Line((53.696819666, 0), (28.896819666, 0))
                Line((28.896819666, 0), (28.896819666, 3))
                Line((28.896819666, 3), (26.496819666, 3))
            make_face()
        extrude(amount=BOSS_EXTRUDE4_DEPTH)

    # Sketch37 → Boss-Extrude5 (add)
    with SkipClean():  # the faces are left unmerged after this step: merging them gives an invalid solid
        with BuildSketch(Plane(origin=(0, 0, -11.7), x_dir=(-1, 0, 0), z_dir=(0, 0, -1))):
            with Locations((-21.696819666, -14.024639165)):
                Rectangle(SKETCH37_W, SKETCH37_H)
        extrude(amount=BOSS_EXTRUDE5_DEPTH)

    # Sketch39 → Boss-Extrude6 (add)
    with SkipClean():  # the faces are left unmerged after this step: merging them gives an invalid solid
        with BuildSketch(Plane.XZ.offset(18.024639165)):
            with Locations((21.696819666, -23.2)):
                Rectangle(SKETCH39_W, SKETCH39_H)
        extrude(amount=BOSS_EXTRUDE6_DEPTH)

    # Sketch40 → Cut-Extrude23 (cut, through all)
    with SkipClean():  # the faces are left unmerged after this step: merging them gives an invalid solid
        with BuildSketch(Plane(origin=(0, 0, -28.2), x_dir=(-1, 0, 0), z_dir=(0, 0, -1))):
            with Locations((-22.696819666, -27.024639165)):
                Rectangle(SKETCH40_W, SKETCH40_H)
        extrude(amount=-CUT_EXTRUDE23_DEPTH, mode=Mode.SUBTRACT)

    # Fillet2
    # the kernel refuses this fillet: 4 mm, written as the material it adds along each edge
    with BuildSketch(Plane(origin=(34.196819666, -18.024639165, -18.2), x_dir=(0, 0, 1), z_dir=(-1, 0, 0))) as fillet2_piece_1_section:
        with BuildLine():
            CenterArc((FILLET2_R, -FILLET2_R), FILLET2_R, 90, 90)
            Line((0, -FILLET2_R), (0, 0))
            Line((0, 0), (FILLET2_R, 0))
        make_face()
    fillet2_piece_1 = extrude(amount=25, mode=Mode.PRIVATE)
    fillet2_piece_1 = split(fillet2_piece_1, bisect_by=Plane(origin=(34.196819666, -21.024639165, -18.2), z_dir=(0, 1, 0)), keep=Keep.TOP, mode=Mode.PRIVATE)
    fillet2_piece_1 = split(fillet2_piece_1, bisect_by=Plane(origin=(33.946819666, -18.024639165, -18.2), z_dir=(1, 0, 0)), keep=Keep.TOP, mode=Mode.PRIVATE)
    add(fillet2_piece_1)
    with BuildSketch(Plane(origin=(34.196819666, -18.024639165, -18.2), x_dir=(0, 0, 1), z_dir=(-1, 0, 0))) as fillet2_piece_2_section:
        with BuildLine():
            CenterArc((FILLET2_R, -FILLET2_R), FILLET2_R, 90, 90)
            Line((0, -FILLET2_R), (0, 0))
            Line((0, 0), (FILLET2_R, 0))
        make_face()
    fillet2_piece_2 = extrude(amount=25, mode=Mode.PRIVATE)
    fillet2_piece_2 = split(fillet2_piece_2, bisect_by=Plane(origin=(34.196819666, -21.024639165, -18.2), z_dir=(0, -1, 0)), keep=Keep.TOP, mode=Mode.PRIVATE)
    fillet2_piece_2 = split(fillet2_piece_2, bisect_by=Plane(origin=(33.946819666, -18.024639165, -18.2), z_dir=(1, 0, 0)), keep=Keep.TOP, mode=Mode.PRIVATE)
    add(fillet2_piece_2)
    with BuildSketch(Plane(origin=(34.196819666, -18.024639165, -18.2), x_dir=(0, 0, 1), z_dir=(-1, 0, 0))) as fillet2_piece_3_section:
        with BuildLine():
            CenterArc((FILLET2_R, -FILLET2_R), FILLET2_R, 90, 90)
            Line((0, -FILLET2_R), (0, 0))
            Line((0, 0), (FILLET2_R, 0))
        make_face()
    fillet2_piece_3 = extrude(amount=25, mode=Mode.PRIVATE)
    fillet2_piece_3 = split(fillet2_piece_3, bisect_by=Plane(origin=(11.446819666, -18.024639165, -18.2), z_dir=(1, 0, 0)), keep=Keep.TOP, mode=Mode.PRIVATE)
    fillet2_piece_3 = split(fillet2_piece_3, bisect_by=Plane(origin=(34.196819666, -21.024639165, -18.2), z_dir=(0, 1, 0)), keep=Keep.TOP, mode=Mode.PRIVATE)
    fillet2_piece_3 = split(fillet2_piece_3, bisect_by=Plane(origin=(33.946819666, -18.024639165, -18.2), z_dir=(-1, 0, 0)), keep=Keep.TOP, mode=Mode.PRIVATE)
    add(fillet2_piece_3)
    with BuildSketch(Plane(origin=(34.196819666, -18.024639165, -18.2), x_dir=(0, 0, 1), z_dir=(-1, 0, 0))) as fillet2_piece_4_section:
        with BuildLine():
            CenterArc((FILLET2_R, -FILLET2_R), FILLET2_R, 90, 90)
            Line((0, -FILLET2_R), (0, 0))
            Line((0, 0), (FILLET2_R, 0))
        make_face()
    fillet2_piece_4 = extrude(amount=25, mode=Mode.PRIVATE)
    fillet2_piece_4 = split(fillet2_piece_4, bisect_by=Plane(origin=(11.446819666, -18.024639165, -18.2), z_dir=(-1, 0, 0)), keep=Keep.TOP, mode=Mode.PRIVATE)
    fillet2_piece_4 = split(fillet2_piece_4, bisect_by=Plane(origin=(34.196819666, -21.024639165, -18.2), z_dir=(0, 1, 0)), keep=Keep.TOP, mode=Mode.PRIVATE)
    add(fillet2_piece_4)
    with BuildSketch(Plane(origin=(34.196819666, -18.024639165, -18.2), x_dir=(0, 0, 1), z_dir=(-1, 0, 0))) as fillet2_piece_5_section:
        with BuildLine():
            CenterArc((FILLET2_R, -FILLET2_R), FILLET2_R, 90, 90)
            Line((0, -FILLET2_R), (0, 0))
            Line((0, 0), (FILLET2_R, 0))
        make_face()
    fillet2_piece_5 = extrude(amount=25, mode=Mode.PRIVATE)
    fillet2_piece_5 = split(fillet2_piece_5, bisect_by=Plane(origin=(11.446819666, -18.024639165, -18.2), z_dir=(-1, 0, 0)), keep=Keep.TOP, mode=Mode.PRIVATE)
    fillet2_piece_5 = split(fillet2_piece_5, bisect_by=Plane(origin=(34.196819666, -21.024639165, -18.2), z_dir=(0, -1, 0)), keep=Keep.TOP, mode=Mode.PRIVATE)
    add(fillet2_piece_5)
    # the kernel refuses this fillet: 4 mm, written as the material it takes off along each edge
    with BuildSketch(Plane(origin=(-0.803180334, -10.024639165, -28.2), x_dir=(0, 0, 1), z_dir=(1, 0, 0))) as fillet2_2_piece_1:
        with BuildLine():
            CenterArc((FILLET2_R, FILLET2_R), FILLET2_R, 180, 90)
            Line((0, FILLET2_R), (0, 0))
            Line((0, 0), (FILLET2_R, 0))
        make_face()
    extrude(amount=45, mode=Mode.SUBTRACT)

    # Sketch45 → Cut-Extrude26 (cut, through all)
    with BuildSketch(Plane(origin=(0, 0, -11.7), x_dir=(-1, 0, 0), z_dir=(0, 0, -1))):
        Polygon((-55.696819666, -18.024639165), (-34.196819666, -18.024639165), (-34.196819666, -10.024639165), (-9.196819666, -10.024639165), (-9.196819666, -18.024639165), (43.303180334, -18.024639165), (43.303180334, 21.275360835), (-55.696819666, 21.275360835), align=None)
    extrude(amount=-CUT_EXTRUDE26_DEPTH, mode=Mode.SUBTRACT)

    # Sketch49 → Boss-Extrude7 (add)
    with BuildSketch(Plane(origin=(0, 0, -28.2), x_dir=(-1, 0, 0), z_dir=(0, 0, -1))):
        with Locations((-31.696819666, -34.774639165)):
            Rectangle(SKETCH49_W, SKETCH49_H)
        with Locations((-12.696819666, -34.774639165)):
            Rectangle(SKETCH49_W_2, SKETCH49_H)
    extrude(amount=-BOSS_EXTRUDE7_DEPTH)

    # M4 Clearance Hole1 (through all)
    with Locations(Plane(origin=(0, -10.024639165, 0), x_dir=(1, 0, 0), z_dir=(0, 1, 0))):
        with Locations((16.396819666, 6), (28.396819666, 6)):
            Hole(M4_CLEARANCE_HOLE1_D / 2)

    # Sketch48 → Cut-Extrude27 (cut)
    with BuildSketch(Plane.XZ.offset(18.024639165)):
        Polygon((18.489714392, -9.625), (20.582609118, -6), (18.489714392, -2.375), (14.30392494, -2.375), (12.211030214, -6), (14.30392494, -9.625), align=None)
        Polygon((30.489714392, -9.625), (32.582609118, -6), (30.489714392, -2.375), (26.30392494, -2.375), (24.211030214, -6), (26.30392494, -9.625), align=None)
    extrude(amount=-CUT_EXTRUDE27_DEPTH, mode=Mode.SUBTRACT)

    # Sketch52 → Boss-Extrude9 (add)
    with BuildSketch(Plane(origin=(34.196819666, 0, 0), x_dir=(0, 0, -1), z_dir=(1, 0, 0))):
        with BuildLine():
            Line((11.85, -10.024639165), (11.85, -18.024639165))
            Line((11.85, -18.024639165), (14.2, -18.024639165))
            ThreePointArc((14.2, -18.024639165), (17.028427125, -19.19621204), (18.2, -22.024639165))
            Line((18.2, -22.024639165), (18.2, -36.524639165))
            Line((18.2, -36.524639165), (28.2, -36.524639165))
            Line((28.2, -36.524639165), (28.2, -14.024639165))
            ThreePointArc((28.2, -14.024639165), (27.028427125, -11.19621204), (24.2, -10.024639165))
            Line((24.2, -10.024639165), (11.85, -10.024639165))
        make_face()
    extrude(amount=BOSS_EXTRUDE9_DEPTH)

    # Chamfer2: read off the stored shape, not the designer's step
    # Chamfer2 outline → Chamfer2 (cut)
    with BuildSketch(Plane.YZ.offset(CHAMFER2_START)):
        with BuildLine():
            Line((-21.024639165, -18.072983346), (-21.024639165, -21.470497278))
            Line((-21.024639165, -21.470497278), (-19.411423781, -17.228383291))
            ThreePointArc((-19.411423781, -17.228383291), (-20.169330925, -17.743703054), (-21.024639165, -18.072983346))
        make_face()
    extrude(amount=CHAMFER2_DEPTH, mode=Mode.SUBTRACT)

    # Sketch52<2> → Boss-Extrude10 (add)
    with BuildSketch(Plane(origin=(34.196819666, 0, 0), x_dir=(0, 0, -1), z_dir=(1, 0, 0)).offset(BOSS_EXTRUDE10_START)):
        with BuildLine():
            Line((24.2, -10.024639165), (11.85, -10.024639165))
            Line((11.85, -10.024639165), (11.85, -18.024639165))
            Line((11.85, -18.024639165), (14.2, -18.024639165))
            ThreePointArc((14.2, -18.024639165), (17.028427125, -19.19621204), (18.2, -22.024639165))
            Line((18.2, -22.024639165), (18.2, -36.524639165))
            Line((18.2, -36.524639165), (28.2, -36.524639165))
            Line((28.2, -36.524639165), (28.2, -14.024639165))
            ThreePointArc((28.2, -14.024639165), (27.028427125, -11.19621204), (24.2, -10.024639165))
        make_face()
    extrude(amount=-BOSS_EXTRUDE10_DEPTH)

    # Fillet3
    fillet3_edges = [cut_extrude17_piece_1.edges().sort_by_distance(p)[0] for p in [
        (37.196819666, -36.524639165, -23.2),
        (8.196819666, -36.524639165, -23.2),
    ]]
    fillet(fillet3_edges, radius=FILLET3_R)


with BuildPart() as cut_extrude17_piece_2:
    # of the separate pieces the step leaves, piece 2, a body of its own (cut_extrude17_pieces)
    add(part.part.solids().sort_by_distance((34.896819666, 29.275360835, 0))[0])


with BuildPart() as cut_extrude17_piece_3:
    # of the separate pieces the step leaves, piece 3, a body of its own (cut_extrude17_pieces)
    add(part.part.solids().sort_by_distance((-43.303180334, 29.275360835, 0))[0])


with BuildPart() as cut_extrude20_tool:
    # Sketch32 → Cut-Extrude20 (new, through all)
    with BuildSketch(Plane(origin=(0, 0, -11.7), x_dir=(-1, 0, 0), z_dir=(0, 0, -1))):
        with Locations((-6.196819666, 25.275360835)):
            Rectangle(SKETCH32_W, SKETCH32_H)
    extrude(amount=-CUT_EXTRUDE20_DEPTH)


with BuildPart() as cut_extrude17_piece_2_1:
    add(cut_extrude17_piece_2.part)

    # Cut-Extrude20: cut by cut_extrude20_tool
    add(cut_extrude20_tool.part, mode=Mode.SUBTRACT)


with BuildPart() as cut_extrude17_piece_3_1:
    add(cut_extrude17_piece_3.part)

    # Cut-Extrude20: cut by cut_extrude20_tool
    add(cut_extrude20_tool.part, mode=Mode.SUBTRACT)


solid = cut_extrude17_piece_1.part
